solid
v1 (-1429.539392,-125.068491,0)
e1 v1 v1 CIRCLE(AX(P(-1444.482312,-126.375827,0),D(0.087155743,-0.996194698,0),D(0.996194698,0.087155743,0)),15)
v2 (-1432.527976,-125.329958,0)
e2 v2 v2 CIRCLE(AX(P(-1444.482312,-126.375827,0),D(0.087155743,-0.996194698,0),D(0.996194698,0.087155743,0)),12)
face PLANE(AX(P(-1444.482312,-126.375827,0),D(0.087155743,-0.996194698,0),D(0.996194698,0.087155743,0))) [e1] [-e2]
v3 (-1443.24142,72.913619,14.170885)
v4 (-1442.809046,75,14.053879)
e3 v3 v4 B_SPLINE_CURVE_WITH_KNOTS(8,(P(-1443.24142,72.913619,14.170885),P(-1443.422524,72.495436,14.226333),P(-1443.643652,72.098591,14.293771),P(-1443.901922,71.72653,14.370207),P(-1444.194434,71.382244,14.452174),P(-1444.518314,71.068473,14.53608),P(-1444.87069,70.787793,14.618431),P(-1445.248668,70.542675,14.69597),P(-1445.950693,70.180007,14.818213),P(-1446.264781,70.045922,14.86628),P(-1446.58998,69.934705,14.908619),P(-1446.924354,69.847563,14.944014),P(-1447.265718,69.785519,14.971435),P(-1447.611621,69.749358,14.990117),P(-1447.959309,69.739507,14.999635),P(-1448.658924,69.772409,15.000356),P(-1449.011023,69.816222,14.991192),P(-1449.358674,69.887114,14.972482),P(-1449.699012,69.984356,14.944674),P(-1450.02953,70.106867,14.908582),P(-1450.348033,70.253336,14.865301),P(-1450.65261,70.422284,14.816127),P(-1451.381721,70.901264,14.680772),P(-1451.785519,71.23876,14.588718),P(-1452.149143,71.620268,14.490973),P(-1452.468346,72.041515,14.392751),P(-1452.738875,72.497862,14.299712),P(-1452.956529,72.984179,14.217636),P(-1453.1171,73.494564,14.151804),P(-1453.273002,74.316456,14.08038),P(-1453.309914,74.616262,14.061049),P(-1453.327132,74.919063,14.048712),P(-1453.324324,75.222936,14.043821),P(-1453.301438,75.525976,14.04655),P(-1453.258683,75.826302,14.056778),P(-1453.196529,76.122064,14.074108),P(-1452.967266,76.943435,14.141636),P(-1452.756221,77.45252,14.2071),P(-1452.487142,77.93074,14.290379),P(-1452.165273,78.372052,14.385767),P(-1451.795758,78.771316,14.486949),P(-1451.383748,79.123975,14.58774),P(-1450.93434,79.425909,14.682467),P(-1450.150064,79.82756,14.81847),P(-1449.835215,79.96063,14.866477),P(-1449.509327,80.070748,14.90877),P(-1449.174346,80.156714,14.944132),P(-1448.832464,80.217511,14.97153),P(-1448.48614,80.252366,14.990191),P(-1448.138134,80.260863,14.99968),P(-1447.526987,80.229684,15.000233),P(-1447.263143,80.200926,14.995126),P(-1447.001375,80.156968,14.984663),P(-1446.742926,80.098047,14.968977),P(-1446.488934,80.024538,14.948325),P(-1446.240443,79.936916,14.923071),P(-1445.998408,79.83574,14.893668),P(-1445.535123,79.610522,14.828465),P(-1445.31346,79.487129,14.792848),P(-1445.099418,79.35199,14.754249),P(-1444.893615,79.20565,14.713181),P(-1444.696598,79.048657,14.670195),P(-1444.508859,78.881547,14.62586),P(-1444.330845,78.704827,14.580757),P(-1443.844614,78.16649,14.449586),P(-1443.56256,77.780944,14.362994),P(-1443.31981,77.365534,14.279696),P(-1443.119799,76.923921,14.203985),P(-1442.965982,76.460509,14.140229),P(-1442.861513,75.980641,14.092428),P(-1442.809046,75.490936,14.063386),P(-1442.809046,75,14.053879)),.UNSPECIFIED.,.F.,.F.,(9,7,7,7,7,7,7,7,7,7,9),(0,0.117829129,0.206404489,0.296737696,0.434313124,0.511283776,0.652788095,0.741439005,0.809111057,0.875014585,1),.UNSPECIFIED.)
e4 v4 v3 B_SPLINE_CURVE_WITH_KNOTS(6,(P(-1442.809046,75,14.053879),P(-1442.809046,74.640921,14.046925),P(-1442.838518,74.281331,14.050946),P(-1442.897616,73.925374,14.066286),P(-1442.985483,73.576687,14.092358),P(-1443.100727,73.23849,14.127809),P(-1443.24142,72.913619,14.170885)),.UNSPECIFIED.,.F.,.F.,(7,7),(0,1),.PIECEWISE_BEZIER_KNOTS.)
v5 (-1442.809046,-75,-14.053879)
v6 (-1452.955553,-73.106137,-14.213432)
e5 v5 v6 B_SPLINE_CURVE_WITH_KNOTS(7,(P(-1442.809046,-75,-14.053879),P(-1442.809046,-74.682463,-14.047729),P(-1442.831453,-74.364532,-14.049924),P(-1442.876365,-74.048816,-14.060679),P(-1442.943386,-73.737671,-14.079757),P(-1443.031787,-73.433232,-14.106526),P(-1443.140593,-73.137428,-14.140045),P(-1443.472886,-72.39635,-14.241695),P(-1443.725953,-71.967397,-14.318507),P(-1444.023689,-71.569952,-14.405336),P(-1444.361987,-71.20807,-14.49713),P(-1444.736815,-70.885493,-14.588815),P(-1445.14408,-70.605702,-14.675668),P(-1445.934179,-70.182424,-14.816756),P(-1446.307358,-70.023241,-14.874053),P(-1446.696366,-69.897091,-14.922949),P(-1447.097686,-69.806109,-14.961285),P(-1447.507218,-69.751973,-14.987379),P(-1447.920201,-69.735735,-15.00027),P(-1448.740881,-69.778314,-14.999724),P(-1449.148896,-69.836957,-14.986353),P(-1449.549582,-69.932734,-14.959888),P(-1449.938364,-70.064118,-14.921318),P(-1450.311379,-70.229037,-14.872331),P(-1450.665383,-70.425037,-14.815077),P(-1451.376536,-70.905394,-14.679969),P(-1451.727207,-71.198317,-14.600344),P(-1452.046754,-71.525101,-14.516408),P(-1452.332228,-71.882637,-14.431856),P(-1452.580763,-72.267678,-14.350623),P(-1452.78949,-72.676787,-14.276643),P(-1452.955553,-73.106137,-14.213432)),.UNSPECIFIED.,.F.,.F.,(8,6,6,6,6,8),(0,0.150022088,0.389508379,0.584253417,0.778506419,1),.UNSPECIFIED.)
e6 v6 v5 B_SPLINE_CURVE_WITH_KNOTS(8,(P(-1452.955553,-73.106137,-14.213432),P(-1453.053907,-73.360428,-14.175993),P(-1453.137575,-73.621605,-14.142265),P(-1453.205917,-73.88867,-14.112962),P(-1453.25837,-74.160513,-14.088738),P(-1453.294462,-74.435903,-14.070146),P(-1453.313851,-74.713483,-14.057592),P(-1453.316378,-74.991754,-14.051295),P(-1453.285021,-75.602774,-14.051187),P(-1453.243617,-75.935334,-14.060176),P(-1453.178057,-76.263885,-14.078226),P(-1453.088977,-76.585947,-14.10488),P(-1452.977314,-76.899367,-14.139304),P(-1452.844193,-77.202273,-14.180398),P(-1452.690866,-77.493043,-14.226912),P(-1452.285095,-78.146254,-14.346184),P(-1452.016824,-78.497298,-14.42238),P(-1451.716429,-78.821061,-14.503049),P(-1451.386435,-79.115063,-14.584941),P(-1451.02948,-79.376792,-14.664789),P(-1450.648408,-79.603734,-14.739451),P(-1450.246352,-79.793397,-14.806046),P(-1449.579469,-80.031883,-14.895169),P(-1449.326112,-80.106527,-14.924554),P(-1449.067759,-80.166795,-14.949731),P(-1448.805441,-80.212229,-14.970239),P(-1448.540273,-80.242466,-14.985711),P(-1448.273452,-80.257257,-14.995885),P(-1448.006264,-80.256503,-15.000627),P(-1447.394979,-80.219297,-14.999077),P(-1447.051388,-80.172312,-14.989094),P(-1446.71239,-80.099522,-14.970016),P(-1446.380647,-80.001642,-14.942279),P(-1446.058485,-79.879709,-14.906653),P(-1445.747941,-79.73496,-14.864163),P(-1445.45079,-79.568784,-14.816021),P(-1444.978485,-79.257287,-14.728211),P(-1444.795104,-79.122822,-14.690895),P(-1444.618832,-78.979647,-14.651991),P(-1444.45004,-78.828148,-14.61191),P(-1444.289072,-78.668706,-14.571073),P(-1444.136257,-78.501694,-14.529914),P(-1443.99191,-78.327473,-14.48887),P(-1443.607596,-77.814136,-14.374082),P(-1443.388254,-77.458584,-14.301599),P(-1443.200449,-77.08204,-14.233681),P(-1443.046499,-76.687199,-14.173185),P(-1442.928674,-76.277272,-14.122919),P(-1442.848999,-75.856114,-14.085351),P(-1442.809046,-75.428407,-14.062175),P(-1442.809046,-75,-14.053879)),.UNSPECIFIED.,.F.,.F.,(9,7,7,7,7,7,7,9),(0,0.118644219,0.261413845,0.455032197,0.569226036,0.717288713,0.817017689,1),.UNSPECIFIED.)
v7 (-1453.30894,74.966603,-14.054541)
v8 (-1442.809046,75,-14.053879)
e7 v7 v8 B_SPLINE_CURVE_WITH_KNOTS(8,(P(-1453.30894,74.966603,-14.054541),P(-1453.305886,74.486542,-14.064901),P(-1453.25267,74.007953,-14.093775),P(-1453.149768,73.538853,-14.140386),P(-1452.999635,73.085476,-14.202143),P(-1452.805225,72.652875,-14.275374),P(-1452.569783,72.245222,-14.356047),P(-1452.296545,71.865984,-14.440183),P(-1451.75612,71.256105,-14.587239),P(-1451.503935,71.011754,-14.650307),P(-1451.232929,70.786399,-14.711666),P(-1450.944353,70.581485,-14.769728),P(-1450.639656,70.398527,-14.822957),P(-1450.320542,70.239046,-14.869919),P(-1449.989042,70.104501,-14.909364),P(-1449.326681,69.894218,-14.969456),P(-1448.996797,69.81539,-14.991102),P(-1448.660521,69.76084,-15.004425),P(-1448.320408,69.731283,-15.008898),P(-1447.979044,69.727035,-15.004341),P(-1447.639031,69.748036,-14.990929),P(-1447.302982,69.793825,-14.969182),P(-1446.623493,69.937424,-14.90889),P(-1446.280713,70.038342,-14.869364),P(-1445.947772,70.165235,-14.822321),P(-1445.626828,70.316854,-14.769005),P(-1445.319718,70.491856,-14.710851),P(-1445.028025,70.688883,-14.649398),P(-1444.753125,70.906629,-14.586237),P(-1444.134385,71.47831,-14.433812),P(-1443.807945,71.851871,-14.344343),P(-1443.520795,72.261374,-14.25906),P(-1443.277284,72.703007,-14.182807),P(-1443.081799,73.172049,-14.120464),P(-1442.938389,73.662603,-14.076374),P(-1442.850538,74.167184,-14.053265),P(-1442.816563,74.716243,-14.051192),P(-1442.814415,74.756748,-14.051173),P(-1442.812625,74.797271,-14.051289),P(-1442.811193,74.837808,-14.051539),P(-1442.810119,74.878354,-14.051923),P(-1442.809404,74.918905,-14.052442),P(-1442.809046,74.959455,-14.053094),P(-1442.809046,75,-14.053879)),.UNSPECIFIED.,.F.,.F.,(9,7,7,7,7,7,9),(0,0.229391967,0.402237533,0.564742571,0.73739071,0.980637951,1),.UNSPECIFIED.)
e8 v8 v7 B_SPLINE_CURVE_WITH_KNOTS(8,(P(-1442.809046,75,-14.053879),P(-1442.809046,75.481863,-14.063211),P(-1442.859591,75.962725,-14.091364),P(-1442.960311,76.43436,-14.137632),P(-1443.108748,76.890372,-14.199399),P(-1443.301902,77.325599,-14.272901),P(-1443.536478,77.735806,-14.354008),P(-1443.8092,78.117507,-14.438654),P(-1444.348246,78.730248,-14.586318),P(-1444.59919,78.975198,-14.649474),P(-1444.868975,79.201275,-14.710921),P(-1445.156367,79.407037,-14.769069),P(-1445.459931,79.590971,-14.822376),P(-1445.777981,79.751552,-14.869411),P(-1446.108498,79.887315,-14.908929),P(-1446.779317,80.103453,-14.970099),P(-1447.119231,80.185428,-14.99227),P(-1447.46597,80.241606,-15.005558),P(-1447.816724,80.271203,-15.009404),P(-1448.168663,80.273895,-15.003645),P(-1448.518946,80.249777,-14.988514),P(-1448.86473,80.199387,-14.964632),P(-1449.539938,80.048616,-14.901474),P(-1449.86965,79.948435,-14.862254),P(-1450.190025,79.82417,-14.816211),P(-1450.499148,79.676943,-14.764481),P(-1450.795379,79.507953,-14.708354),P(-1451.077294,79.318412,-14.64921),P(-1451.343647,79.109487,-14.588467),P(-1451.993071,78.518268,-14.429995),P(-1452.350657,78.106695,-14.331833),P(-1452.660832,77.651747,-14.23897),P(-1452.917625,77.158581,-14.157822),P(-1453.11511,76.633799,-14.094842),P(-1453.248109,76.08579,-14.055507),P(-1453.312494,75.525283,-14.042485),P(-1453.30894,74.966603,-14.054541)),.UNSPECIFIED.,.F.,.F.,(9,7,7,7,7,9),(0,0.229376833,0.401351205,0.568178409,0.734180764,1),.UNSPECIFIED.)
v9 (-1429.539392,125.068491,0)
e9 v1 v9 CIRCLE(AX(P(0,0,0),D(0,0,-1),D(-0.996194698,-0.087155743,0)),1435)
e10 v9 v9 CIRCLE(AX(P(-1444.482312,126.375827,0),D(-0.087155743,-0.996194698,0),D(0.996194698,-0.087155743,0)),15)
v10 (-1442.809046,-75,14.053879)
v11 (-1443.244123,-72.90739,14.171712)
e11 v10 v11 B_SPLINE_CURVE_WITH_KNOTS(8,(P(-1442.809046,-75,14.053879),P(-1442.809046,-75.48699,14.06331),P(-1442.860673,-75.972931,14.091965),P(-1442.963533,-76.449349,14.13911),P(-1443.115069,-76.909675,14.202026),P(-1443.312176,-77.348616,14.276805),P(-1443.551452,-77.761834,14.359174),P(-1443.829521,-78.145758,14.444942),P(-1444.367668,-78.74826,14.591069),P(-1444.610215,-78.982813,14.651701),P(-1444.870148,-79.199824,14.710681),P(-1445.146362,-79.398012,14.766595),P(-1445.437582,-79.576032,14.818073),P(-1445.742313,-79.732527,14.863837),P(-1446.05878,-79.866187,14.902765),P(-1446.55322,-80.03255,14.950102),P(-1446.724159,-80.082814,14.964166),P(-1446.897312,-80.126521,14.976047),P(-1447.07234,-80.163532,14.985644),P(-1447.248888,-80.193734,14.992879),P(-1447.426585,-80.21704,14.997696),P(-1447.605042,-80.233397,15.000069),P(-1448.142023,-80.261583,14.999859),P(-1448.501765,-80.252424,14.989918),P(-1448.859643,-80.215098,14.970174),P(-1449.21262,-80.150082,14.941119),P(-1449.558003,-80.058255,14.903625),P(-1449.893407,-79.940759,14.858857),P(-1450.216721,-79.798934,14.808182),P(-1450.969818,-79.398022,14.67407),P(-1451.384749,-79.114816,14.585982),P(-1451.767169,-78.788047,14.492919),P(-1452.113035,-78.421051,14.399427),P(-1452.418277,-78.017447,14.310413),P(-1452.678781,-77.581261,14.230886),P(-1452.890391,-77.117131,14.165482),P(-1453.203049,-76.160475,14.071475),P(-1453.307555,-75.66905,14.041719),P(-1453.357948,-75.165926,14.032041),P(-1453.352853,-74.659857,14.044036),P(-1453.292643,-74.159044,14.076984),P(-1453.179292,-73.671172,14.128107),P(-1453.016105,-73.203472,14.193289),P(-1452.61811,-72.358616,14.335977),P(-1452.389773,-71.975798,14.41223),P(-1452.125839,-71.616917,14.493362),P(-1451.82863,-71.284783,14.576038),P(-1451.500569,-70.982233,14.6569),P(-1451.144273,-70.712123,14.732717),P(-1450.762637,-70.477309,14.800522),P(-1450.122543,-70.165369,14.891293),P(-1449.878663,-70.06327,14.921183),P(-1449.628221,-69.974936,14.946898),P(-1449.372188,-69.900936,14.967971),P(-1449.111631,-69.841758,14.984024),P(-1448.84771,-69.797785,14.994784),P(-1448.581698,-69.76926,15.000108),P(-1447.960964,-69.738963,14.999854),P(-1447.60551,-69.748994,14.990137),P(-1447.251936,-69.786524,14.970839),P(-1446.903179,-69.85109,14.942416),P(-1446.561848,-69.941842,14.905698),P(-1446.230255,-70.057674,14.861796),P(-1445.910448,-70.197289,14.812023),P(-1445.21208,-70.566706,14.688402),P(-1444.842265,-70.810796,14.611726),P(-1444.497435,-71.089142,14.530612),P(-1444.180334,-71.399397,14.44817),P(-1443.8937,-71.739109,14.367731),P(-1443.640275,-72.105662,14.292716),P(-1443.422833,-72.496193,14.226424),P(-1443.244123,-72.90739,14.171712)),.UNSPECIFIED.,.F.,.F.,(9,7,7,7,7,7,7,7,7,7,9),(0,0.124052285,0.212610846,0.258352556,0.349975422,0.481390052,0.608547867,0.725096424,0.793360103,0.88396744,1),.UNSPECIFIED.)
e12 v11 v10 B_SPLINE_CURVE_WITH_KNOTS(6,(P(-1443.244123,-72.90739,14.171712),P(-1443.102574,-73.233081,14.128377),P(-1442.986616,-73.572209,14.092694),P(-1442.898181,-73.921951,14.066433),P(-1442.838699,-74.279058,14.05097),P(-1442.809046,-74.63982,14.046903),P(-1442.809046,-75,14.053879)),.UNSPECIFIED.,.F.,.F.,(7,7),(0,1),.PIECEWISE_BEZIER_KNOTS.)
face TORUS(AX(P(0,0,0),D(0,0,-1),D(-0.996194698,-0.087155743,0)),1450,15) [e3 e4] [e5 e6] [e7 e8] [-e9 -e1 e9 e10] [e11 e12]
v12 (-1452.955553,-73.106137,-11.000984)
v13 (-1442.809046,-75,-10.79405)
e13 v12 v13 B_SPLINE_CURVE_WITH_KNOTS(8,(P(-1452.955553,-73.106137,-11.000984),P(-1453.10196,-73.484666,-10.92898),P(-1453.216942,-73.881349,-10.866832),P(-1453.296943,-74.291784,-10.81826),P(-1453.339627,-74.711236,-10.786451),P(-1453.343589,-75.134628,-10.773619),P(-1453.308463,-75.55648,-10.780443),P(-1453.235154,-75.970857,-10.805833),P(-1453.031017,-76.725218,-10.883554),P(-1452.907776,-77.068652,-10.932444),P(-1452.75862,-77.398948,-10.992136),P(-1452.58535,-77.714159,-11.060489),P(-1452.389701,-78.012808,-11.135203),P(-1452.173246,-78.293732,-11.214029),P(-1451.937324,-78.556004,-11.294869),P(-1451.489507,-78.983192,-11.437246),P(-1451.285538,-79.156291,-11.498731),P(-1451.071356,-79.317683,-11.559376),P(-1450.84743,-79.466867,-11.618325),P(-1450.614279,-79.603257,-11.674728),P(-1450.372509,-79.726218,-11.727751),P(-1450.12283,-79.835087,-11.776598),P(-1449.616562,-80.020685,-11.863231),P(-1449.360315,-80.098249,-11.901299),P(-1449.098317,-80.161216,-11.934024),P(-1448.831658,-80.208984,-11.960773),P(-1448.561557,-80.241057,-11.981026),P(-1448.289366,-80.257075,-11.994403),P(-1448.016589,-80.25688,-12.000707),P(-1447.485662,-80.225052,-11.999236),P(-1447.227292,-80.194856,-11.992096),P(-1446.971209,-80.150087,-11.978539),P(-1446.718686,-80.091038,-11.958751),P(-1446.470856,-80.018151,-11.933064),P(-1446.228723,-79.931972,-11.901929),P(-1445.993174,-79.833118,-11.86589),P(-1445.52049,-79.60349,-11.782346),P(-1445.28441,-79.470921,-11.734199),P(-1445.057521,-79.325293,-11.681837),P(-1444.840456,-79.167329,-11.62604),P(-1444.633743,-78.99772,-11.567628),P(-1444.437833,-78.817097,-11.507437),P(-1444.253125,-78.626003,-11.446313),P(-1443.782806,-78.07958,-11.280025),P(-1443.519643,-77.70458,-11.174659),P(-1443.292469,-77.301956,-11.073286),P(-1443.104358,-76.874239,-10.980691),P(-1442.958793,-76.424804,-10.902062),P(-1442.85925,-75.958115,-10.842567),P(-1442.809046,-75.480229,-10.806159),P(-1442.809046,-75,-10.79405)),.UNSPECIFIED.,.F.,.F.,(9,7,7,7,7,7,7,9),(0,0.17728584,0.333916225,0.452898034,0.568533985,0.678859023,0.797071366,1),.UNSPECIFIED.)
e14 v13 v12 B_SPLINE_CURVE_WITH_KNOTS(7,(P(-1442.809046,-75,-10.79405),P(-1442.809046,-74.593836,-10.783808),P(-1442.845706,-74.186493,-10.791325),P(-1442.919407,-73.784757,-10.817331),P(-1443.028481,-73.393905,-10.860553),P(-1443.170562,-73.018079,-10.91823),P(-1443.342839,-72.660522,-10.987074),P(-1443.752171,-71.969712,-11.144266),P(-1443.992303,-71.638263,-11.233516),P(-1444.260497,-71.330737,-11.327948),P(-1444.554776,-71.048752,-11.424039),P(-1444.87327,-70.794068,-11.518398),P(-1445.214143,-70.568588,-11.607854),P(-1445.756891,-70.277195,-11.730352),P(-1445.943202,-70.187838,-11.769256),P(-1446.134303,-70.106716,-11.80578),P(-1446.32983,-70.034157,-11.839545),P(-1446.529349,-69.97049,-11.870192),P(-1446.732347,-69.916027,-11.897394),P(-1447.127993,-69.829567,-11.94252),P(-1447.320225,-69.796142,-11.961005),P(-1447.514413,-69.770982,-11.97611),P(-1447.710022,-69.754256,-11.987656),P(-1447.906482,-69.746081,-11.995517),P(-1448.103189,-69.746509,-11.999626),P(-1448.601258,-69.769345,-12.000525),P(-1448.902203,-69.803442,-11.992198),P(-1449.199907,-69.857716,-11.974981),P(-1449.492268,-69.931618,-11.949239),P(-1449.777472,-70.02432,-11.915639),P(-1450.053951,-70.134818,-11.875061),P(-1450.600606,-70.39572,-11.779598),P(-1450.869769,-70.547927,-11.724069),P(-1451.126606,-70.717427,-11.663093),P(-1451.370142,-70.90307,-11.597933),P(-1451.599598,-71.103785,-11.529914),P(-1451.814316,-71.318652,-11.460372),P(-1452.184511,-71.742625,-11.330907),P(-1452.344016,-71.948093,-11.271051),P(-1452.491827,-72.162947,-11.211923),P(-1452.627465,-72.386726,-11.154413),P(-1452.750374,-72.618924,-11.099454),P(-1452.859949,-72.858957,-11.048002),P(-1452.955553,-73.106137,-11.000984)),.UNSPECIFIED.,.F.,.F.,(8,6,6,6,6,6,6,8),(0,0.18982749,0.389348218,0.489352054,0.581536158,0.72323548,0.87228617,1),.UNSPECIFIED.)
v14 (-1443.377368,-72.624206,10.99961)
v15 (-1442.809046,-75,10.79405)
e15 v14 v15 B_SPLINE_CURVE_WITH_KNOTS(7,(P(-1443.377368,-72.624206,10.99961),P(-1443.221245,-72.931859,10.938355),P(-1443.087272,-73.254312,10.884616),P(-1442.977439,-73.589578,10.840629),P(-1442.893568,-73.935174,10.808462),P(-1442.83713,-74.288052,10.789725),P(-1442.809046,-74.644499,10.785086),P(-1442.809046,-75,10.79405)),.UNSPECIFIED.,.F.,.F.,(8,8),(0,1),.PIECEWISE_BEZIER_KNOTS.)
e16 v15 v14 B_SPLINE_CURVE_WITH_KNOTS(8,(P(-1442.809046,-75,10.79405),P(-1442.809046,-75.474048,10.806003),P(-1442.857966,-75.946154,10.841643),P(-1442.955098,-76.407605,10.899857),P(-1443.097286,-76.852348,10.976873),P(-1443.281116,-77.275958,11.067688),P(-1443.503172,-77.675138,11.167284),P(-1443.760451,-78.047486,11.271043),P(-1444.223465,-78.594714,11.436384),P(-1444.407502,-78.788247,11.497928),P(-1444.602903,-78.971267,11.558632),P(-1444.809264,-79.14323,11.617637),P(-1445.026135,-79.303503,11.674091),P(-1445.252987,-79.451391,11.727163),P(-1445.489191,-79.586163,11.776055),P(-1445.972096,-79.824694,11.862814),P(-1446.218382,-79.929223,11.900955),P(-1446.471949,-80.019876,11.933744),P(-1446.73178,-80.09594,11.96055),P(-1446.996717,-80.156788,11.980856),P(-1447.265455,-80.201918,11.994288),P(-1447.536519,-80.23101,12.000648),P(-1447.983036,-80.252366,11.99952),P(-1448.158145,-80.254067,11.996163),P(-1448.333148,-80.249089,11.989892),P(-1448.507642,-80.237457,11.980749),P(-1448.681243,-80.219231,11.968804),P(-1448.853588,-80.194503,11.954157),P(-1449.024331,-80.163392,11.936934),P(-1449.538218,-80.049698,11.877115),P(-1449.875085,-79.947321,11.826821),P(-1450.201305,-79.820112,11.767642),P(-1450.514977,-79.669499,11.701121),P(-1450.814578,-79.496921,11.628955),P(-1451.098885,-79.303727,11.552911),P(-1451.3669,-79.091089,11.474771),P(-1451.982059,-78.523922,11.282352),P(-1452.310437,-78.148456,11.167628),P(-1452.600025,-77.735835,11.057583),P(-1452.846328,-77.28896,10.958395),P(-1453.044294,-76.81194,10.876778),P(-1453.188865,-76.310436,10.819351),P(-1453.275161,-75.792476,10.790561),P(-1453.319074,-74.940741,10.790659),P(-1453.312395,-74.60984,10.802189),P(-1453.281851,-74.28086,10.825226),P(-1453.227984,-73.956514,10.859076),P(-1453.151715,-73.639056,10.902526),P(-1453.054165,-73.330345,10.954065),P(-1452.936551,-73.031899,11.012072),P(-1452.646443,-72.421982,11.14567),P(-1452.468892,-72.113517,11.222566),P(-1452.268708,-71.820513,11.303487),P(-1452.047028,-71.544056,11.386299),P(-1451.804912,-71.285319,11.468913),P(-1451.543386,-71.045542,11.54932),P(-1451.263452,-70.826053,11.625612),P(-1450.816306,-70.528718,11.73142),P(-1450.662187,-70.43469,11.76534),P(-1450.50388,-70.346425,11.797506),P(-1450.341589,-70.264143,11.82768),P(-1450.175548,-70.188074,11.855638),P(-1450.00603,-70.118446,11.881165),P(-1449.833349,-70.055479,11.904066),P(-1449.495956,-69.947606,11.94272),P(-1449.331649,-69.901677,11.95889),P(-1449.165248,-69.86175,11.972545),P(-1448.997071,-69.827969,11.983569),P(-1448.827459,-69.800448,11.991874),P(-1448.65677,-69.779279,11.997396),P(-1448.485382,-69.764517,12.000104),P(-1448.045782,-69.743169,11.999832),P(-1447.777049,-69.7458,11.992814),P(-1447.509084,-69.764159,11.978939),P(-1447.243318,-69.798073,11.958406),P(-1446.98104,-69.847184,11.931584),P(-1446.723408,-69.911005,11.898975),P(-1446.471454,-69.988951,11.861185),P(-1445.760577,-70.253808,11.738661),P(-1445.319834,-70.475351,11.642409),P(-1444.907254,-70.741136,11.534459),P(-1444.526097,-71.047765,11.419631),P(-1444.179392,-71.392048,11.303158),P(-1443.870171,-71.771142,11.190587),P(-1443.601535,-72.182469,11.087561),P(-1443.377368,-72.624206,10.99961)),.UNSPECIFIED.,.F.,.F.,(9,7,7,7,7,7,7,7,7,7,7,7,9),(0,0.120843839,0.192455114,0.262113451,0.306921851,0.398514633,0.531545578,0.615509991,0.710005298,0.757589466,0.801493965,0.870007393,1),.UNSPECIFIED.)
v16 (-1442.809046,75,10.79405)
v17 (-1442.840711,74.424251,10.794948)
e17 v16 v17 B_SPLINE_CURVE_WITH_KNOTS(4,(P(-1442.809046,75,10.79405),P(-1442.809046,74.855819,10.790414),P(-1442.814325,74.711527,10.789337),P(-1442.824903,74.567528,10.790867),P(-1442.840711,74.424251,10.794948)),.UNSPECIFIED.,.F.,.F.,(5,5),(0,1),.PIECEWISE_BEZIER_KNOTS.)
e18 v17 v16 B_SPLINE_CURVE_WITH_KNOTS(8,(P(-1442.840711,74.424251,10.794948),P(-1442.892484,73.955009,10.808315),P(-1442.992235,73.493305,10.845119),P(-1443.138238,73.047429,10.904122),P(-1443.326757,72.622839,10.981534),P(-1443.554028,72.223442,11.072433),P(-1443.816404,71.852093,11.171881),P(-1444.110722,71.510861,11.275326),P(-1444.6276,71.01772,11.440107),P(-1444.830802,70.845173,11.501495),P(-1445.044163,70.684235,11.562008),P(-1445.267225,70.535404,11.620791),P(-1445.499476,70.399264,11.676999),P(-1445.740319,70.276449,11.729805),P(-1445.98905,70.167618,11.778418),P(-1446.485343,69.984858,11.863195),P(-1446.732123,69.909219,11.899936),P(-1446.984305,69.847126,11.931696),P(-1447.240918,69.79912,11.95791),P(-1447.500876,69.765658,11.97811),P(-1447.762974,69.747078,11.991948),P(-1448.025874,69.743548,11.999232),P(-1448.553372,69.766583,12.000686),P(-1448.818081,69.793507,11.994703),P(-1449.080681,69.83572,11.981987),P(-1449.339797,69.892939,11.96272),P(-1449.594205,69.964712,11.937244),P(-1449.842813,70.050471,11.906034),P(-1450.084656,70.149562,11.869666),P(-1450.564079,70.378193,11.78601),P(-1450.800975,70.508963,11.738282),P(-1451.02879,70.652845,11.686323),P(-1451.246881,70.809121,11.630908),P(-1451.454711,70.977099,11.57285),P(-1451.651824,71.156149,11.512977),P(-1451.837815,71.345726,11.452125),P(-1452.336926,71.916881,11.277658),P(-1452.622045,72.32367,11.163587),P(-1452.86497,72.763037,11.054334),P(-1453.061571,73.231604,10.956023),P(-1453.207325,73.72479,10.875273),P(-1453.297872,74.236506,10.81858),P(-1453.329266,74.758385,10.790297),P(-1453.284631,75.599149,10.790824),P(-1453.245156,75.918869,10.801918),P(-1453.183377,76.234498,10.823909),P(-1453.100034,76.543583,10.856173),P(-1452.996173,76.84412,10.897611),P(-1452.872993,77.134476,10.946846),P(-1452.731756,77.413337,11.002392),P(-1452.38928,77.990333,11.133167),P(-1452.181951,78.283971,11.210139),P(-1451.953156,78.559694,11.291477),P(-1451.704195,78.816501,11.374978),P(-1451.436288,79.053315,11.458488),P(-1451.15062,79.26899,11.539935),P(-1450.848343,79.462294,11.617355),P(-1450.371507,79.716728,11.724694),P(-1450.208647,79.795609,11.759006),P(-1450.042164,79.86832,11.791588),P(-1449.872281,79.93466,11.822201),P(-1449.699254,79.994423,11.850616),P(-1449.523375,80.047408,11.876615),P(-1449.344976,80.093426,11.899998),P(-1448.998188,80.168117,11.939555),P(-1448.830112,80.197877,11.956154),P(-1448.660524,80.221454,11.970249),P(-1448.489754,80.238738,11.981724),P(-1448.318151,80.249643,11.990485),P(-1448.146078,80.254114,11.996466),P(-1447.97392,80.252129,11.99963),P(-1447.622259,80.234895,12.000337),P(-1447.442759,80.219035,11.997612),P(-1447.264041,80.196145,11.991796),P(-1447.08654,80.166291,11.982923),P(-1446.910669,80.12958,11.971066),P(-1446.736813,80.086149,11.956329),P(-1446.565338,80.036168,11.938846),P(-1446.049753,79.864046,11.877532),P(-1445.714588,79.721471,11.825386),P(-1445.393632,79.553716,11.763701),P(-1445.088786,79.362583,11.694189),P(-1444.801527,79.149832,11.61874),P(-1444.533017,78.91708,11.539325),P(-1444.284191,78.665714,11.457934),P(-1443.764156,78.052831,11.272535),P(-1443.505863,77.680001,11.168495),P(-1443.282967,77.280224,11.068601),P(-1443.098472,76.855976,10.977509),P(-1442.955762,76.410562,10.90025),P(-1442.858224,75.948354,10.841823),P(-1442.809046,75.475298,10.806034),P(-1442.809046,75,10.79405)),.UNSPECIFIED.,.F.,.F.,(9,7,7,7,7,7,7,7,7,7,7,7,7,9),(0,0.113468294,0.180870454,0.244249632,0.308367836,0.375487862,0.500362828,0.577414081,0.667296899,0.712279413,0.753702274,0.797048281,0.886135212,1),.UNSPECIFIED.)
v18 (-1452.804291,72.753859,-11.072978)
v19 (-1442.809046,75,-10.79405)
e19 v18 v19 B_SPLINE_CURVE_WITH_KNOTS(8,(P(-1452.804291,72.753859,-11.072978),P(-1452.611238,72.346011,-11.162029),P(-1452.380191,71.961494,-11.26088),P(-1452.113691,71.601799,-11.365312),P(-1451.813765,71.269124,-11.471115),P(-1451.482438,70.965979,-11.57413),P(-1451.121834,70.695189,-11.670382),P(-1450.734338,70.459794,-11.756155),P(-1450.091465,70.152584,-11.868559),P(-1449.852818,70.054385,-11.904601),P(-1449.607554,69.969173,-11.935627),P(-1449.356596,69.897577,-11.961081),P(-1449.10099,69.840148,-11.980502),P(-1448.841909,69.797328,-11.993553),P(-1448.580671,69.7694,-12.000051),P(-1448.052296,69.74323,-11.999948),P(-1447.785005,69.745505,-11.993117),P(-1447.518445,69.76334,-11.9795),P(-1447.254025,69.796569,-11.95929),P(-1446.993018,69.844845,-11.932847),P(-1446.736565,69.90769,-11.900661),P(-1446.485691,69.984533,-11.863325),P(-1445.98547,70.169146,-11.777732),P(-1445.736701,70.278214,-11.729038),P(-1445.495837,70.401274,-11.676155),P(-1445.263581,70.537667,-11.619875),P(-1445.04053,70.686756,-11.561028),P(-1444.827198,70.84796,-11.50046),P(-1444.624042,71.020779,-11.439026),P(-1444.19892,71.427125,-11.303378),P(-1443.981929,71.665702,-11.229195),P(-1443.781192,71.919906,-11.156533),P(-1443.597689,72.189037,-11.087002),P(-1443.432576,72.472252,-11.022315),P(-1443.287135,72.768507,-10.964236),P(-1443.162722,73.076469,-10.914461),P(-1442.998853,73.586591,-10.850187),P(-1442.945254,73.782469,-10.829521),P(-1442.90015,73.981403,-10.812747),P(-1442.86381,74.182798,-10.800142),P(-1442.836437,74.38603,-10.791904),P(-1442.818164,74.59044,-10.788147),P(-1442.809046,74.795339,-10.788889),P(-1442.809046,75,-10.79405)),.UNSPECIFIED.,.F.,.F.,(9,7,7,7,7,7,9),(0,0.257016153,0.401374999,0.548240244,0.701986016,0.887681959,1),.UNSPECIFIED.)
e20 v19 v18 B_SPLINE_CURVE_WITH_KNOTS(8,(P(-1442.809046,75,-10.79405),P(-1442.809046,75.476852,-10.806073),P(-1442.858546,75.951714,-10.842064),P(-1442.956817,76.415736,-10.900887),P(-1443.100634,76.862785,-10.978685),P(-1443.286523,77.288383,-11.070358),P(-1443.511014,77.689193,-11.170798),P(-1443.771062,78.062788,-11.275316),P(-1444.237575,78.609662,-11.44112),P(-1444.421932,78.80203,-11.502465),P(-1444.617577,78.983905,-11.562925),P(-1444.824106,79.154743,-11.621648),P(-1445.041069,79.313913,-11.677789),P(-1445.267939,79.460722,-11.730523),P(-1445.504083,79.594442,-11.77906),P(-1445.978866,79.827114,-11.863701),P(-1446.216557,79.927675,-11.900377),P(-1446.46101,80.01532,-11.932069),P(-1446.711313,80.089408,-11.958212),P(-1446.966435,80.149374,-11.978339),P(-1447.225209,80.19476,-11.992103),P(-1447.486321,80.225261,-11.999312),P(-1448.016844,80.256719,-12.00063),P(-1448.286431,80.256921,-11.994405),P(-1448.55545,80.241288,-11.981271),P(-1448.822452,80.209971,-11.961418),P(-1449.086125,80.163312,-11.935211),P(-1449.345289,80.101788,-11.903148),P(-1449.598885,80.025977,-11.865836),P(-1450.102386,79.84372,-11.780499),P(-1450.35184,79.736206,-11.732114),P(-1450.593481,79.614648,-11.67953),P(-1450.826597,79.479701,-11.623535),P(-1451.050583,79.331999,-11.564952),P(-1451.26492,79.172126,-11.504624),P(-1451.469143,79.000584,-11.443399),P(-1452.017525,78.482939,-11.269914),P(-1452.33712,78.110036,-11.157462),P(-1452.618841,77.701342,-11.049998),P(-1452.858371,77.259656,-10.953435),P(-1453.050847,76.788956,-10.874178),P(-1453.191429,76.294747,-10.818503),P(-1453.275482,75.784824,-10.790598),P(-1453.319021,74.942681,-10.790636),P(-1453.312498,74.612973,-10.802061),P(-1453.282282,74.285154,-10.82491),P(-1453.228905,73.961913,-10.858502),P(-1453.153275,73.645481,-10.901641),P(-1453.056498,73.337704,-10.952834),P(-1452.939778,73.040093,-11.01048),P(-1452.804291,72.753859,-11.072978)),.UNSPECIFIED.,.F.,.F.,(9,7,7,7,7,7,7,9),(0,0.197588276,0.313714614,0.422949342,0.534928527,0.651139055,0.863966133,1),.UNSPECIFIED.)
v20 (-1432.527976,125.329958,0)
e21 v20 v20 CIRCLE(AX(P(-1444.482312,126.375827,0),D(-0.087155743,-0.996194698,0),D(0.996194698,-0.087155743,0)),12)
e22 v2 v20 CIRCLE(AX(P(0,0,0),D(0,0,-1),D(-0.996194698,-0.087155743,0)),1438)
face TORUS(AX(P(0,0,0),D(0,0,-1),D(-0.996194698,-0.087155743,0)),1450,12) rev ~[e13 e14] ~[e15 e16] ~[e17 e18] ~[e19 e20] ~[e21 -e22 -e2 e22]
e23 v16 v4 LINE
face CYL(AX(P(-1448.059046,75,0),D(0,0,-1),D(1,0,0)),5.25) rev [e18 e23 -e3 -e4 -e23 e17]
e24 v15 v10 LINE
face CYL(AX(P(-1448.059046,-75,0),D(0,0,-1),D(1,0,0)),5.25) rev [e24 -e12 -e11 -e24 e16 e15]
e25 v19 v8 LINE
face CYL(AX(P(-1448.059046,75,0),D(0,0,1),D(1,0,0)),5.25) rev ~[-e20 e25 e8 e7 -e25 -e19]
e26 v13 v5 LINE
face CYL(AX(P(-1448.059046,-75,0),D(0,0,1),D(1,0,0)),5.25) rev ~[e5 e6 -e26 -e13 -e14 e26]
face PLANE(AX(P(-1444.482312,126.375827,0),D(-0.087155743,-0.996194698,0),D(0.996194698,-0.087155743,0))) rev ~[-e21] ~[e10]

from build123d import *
from build123d import SkipClean  # not in build123d's __all__

# Parameters (mm, degrees)
F0_R          = 15
F0_R_2        = 12
F1_ANGLE_BACK = 5
F1_ANGLE      = 10
F2_R          = 5.25
F3_DEPTH      = 15.001
F3_DEPTH_BACK = 15.001


with BuildPart() as f1:
    # F0 (on Front) → F1 (revolve)
    with BuildSketch(Plane.XZ, mode=Mode.PRIVATE) as f1_sk:
        with Locations((-1450, 0)):
            Circle(F0_R)
        with Locations((-1450, 0)):
            Circle(F0_R_2, mode=Mode.SUBTRACT)
    revolve(f1_sk.sketch.rotate(Axis((0, 0, 190.0846064091), (0, 0, -1)), -F1_ANGLE_BACK), axis=Axis((0, 0, 190.0846064091), (0, 0, -1)), revolution_arc=F1_ANGLE)

    # F2 (on Top) → F3 (cut, two sides)
    with BuildSketch(Plane.XY) as f3_sk:
        with Locations((-1448.0590457575, -75)):
            Circle(F2_R)
        with Locations((-1448.0590457575, 75)):
            Circle(F2_R)
    with SkipClean():  # cleaning this boolean's faces spoils the solid; the shape is the same uncleaned
        extrude(amount=-F3_DEPTH, mode=Mode.SUBTRACT)
        extrude(f3_sk.sketch, amount=F3_DEPTH_BACK, mode=Mode.SUBTRACT)


solid = f1.part
